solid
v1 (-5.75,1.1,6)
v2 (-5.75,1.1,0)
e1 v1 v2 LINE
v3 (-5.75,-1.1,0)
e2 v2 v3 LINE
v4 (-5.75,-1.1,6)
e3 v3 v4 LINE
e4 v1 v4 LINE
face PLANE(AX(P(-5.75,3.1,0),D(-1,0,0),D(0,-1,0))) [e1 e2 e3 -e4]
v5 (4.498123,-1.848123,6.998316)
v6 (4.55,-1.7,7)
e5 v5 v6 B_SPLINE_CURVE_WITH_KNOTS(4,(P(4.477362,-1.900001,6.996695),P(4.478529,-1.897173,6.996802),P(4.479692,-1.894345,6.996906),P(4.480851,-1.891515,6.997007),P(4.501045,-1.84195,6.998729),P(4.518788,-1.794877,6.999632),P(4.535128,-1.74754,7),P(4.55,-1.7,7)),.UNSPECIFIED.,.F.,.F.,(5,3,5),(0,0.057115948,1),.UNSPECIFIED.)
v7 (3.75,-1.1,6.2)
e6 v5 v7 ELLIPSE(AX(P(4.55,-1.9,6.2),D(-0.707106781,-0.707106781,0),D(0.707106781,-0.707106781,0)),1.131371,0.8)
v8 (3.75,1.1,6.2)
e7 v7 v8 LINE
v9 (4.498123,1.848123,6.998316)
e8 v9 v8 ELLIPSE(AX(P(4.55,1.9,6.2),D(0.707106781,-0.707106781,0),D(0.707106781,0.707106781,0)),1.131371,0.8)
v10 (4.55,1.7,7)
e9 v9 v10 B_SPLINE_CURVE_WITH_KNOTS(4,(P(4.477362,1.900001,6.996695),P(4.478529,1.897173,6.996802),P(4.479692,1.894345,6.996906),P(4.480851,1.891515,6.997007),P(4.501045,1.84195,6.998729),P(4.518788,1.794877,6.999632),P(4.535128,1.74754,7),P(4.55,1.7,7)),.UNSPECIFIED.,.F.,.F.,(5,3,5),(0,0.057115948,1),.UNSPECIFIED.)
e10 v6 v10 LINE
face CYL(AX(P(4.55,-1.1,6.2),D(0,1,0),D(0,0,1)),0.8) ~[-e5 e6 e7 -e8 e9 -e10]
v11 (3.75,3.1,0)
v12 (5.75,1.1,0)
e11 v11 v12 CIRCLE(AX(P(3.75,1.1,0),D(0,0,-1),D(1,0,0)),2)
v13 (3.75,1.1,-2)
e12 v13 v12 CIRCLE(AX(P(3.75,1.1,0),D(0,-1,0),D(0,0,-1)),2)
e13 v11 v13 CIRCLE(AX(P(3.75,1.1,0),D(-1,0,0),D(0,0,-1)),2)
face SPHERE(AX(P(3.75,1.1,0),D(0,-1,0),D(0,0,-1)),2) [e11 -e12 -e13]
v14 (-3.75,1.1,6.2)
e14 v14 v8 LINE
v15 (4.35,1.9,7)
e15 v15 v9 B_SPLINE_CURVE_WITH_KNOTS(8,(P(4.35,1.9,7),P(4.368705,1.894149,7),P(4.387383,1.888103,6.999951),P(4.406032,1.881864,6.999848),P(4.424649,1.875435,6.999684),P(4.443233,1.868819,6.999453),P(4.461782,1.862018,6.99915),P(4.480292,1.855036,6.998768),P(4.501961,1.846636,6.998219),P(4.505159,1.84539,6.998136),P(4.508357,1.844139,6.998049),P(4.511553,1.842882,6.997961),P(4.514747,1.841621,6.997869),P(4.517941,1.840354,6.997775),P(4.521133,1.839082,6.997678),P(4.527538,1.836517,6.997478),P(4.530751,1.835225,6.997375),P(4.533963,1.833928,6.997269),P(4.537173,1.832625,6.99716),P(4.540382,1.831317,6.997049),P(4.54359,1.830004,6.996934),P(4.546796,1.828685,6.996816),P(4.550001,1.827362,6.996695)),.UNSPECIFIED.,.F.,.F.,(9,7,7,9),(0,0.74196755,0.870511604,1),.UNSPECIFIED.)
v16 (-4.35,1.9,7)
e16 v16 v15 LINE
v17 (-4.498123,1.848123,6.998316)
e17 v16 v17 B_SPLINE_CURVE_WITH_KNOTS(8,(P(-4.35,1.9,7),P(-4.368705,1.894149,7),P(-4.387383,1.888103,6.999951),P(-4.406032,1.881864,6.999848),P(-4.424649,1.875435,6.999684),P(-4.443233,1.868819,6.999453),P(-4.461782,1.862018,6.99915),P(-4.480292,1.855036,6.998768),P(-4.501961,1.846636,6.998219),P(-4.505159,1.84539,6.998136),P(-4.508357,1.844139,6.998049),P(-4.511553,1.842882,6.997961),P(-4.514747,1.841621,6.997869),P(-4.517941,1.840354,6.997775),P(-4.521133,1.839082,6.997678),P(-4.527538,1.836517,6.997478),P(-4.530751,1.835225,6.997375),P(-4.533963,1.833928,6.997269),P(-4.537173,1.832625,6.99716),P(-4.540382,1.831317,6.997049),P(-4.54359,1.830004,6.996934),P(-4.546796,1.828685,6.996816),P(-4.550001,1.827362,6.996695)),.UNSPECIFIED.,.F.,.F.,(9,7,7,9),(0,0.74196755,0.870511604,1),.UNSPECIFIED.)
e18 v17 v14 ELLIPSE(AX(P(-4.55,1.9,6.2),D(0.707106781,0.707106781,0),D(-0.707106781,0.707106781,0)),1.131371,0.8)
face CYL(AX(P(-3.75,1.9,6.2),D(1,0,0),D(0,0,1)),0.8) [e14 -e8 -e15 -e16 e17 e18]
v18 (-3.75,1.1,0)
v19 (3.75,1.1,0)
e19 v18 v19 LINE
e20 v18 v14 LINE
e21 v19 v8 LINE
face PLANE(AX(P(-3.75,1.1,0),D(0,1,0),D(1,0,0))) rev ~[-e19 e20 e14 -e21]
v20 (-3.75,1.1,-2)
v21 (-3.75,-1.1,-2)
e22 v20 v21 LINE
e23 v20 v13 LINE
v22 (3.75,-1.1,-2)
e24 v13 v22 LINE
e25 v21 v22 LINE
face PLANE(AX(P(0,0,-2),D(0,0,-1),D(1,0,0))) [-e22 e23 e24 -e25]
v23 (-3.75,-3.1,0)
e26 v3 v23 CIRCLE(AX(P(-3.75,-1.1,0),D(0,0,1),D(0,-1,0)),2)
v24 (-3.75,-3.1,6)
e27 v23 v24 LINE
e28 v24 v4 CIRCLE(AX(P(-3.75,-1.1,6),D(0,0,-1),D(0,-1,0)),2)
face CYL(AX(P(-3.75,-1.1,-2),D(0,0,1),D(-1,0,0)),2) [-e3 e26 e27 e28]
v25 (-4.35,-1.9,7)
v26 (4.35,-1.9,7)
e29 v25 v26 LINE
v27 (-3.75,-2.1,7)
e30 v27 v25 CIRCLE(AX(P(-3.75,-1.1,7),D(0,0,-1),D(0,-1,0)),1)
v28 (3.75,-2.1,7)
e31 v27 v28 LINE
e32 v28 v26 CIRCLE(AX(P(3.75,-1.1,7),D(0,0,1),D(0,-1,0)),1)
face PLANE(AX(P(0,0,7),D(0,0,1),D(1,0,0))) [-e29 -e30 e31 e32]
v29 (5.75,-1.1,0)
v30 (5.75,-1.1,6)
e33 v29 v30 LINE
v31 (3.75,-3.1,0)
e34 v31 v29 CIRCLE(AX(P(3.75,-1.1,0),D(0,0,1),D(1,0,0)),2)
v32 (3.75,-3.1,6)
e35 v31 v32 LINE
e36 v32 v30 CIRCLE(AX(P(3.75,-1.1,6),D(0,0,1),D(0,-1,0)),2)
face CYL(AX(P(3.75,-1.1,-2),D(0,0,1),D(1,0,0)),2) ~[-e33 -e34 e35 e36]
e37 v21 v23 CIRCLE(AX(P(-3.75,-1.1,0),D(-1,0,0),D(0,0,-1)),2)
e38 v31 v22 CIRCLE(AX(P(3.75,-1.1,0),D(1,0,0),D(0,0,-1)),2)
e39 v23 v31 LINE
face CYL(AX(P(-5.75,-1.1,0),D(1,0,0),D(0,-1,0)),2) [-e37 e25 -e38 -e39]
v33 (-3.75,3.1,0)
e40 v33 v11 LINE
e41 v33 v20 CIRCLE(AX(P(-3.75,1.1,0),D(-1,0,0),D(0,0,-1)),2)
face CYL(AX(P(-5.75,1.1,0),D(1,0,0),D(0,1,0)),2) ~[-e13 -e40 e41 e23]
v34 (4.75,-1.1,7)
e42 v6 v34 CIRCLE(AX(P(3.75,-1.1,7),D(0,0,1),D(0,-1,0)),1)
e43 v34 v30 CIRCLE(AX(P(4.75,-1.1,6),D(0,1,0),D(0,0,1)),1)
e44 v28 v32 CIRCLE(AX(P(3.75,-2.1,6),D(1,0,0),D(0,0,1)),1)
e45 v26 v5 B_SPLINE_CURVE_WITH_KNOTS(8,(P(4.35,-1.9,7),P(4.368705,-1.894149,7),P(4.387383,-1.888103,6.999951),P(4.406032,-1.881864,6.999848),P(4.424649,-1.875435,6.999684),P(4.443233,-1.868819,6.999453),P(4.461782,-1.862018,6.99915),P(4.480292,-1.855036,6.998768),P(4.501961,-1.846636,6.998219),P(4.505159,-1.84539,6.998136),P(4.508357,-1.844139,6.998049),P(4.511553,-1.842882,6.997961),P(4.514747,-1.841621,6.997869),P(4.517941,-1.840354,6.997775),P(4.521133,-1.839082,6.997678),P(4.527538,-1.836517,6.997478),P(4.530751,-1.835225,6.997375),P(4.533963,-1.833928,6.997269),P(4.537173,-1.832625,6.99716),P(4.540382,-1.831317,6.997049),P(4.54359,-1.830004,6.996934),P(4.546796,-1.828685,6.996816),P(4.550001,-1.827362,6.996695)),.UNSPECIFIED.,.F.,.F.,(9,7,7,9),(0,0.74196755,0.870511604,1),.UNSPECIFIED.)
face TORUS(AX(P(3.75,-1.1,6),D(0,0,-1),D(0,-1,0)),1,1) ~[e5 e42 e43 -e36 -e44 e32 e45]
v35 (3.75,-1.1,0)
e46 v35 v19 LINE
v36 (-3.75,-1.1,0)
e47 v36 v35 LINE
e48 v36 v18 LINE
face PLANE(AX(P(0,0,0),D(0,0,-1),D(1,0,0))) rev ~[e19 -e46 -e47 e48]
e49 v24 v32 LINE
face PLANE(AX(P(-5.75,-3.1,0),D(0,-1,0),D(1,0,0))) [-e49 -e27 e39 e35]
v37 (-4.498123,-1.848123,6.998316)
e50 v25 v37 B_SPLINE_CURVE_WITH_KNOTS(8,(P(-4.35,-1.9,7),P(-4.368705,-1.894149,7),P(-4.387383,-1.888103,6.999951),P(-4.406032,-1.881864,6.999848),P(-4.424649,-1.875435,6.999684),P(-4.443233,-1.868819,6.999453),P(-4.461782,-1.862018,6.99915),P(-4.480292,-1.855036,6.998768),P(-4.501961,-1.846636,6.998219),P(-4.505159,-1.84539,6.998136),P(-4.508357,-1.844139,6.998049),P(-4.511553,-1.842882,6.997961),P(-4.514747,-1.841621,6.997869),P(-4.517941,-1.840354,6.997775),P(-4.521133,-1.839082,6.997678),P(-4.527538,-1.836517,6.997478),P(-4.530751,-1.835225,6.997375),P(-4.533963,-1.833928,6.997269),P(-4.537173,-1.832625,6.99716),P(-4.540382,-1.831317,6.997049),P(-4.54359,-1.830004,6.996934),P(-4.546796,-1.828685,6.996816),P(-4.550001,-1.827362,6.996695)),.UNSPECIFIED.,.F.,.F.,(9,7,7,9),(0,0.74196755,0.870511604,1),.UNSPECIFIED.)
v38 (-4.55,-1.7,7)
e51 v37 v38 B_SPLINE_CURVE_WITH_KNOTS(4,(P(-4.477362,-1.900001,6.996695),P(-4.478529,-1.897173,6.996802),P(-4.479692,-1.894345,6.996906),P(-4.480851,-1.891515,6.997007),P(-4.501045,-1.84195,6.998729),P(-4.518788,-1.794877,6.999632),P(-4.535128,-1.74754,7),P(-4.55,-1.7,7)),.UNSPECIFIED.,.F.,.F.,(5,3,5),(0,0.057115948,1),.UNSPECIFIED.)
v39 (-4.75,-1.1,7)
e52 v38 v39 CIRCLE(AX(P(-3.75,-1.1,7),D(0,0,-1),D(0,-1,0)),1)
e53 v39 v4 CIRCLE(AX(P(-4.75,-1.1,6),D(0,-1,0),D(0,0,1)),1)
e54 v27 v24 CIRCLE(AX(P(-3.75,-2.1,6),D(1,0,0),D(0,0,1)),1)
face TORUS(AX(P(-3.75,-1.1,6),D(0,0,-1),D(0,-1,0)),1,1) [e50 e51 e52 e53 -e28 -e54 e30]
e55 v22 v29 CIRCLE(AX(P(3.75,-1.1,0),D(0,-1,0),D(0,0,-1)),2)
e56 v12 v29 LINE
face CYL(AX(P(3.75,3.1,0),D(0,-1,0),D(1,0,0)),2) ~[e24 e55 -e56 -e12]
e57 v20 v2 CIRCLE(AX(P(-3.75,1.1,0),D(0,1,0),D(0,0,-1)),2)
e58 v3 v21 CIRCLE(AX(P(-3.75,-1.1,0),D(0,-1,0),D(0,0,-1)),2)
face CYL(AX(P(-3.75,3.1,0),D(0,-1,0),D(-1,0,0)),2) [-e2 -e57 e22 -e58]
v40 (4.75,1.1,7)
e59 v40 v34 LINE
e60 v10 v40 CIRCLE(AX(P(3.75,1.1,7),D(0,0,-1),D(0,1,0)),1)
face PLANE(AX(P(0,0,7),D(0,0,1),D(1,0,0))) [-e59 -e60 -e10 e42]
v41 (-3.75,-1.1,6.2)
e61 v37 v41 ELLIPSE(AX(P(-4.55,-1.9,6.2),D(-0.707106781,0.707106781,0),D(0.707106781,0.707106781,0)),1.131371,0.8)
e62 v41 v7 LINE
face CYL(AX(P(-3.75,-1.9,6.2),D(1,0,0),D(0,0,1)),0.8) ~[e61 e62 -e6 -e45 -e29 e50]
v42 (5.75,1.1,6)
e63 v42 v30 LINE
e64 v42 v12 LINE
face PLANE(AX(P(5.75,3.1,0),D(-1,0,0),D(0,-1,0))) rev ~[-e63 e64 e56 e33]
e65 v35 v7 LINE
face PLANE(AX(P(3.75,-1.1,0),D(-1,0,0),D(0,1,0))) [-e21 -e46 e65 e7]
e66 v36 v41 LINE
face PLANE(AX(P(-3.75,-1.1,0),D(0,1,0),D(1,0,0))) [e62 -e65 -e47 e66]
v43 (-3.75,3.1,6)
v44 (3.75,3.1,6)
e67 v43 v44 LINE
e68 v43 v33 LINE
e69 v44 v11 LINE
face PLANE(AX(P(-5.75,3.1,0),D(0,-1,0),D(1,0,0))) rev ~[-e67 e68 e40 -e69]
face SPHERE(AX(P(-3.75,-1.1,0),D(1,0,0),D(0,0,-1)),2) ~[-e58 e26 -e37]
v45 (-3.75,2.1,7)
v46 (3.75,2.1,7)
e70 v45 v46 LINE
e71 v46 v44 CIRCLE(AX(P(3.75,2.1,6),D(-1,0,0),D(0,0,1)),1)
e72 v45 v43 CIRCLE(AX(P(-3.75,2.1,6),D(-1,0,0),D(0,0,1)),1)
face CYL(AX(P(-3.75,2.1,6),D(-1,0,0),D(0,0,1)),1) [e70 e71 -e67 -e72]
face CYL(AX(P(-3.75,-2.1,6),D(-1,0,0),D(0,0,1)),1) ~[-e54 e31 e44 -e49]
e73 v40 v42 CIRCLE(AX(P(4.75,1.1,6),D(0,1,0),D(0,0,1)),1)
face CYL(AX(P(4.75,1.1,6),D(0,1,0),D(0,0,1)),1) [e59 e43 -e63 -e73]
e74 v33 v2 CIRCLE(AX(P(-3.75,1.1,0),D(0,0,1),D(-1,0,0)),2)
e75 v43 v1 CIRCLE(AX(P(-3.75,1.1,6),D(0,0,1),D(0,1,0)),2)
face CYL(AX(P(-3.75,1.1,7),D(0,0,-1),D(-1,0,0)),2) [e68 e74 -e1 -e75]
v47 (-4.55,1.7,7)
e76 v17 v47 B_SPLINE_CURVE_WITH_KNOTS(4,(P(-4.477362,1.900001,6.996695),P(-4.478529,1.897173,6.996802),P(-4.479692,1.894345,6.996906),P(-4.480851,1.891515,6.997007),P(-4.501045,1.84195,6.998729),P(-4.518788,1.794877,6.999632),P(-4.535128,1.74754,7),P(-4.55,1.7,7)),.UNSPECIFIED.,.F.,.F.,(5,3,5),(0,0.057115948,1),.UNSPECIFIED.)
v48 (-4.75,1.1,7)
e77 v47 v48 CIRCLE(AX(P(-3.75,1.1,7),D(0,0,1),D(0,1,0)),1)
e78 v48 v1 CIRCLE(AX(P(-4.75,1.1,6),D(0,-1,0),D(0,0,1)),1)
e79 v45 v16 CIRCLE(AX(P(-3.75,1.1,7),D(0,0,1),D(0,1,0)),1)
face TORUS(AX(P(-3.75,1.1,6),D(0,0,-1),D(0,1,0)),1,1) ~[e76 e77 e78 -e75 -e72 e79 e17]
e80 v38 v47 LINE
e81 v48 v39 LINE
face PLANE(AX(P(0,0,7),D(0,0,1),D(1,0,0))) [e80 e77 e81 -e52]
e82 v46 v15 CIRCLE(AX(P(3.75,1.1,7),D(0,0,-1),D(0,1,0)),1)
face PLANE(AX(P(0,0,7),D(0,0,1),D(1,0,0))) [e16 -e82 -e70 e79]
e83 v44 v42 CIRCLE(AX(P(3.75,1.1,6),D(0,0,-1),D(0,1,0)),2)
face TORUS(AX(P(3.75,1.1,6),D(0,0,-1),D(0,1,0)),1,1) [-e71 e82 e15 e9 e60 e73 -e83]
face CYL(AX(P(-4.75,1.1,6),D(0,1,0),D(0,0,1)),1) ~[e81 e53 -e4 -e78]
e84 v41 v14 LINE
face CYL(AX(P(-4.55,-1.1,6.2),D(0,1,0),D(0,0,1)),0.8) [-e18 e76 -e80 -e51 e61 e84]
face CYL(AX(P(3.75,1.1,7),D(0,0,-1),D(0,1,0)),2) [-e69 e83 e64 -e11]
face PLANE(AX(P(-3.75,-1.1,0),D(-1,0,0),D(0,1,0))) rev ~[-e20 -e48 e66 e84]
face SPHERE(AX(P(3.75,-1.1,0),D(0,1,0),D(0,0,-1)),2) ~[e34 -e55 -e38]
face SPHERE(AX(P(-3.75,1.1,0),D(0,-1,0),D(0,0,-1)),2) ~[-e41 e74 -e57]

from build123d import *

# Parameters (mm, degrees)
F0_W         = 11.5
F0_H         = 6.2
F0_W_2       = 7.5
F0_H_2       = 2.2
F1_DEPTH     = 7
F2_W         = 11.5
F2_H         = 6.2
F3_DEPTH     = 2
F4_R         = 2
F5_R         = 0.8
F6_T1_DEPTH  = 2.2
F6_T3_DEPTH  = 7.5
F6_T6_ANGLE  = 90
F6_T8_ANGLE  = 90
F6_T10_ANGLE = 90
F6_T12_ANGLE = 90


# Not quite as in the source:
# - a fillet or chamfer that OpenCascade refuses, or shapes differently, is made with other operations: its cross-section is extruded or revolved along the edge and cut away or added


with BuildPart() as f1:
    # F0 (on Top) → F1 (new body)
    with BuildSketch(Plane.XY):
        Rectangle(F0_W, F0_H)
        Rectangle(F0_W_2, F0_H_2, mode=Mode.SUBTRACT)
    extrude(amount=F1_DEPTH)

    # F2 (on face) → F3 (join)
    with BuildSketch(Plane(origin=(0, 0, 0), x_dir=(1, 0, 0), z_dir=(0, 0, -1))):
        Rectangle(F2_W, F2_H)
    extrude(amount=F3_DEPTH)

    # F4
    f4_edges = [f1.edges().sort_by_distance(p)[0] for p in [
        (5.75, 0, -2),
        (0, -3.1, -2),
        (-5.75, 0, -2),
        (0, 3.1, -2),
        (5.75, -3.1, 2.5),
        (5.75, 3.1, 2.5),
        (-5.75, -3.1, 2.5),
        (-5.75, 3.1, 2.5),
    ]]
    fillet(f4_edges, radius=F4_R)

    # F5
    f5_edges = [f1.edges().sort_by_distance(p)[0] for p in [
        (0, -1.1, 7),
        (3.75, 0, 7),
        (-3.75, 0, 7),
        (0, 1.1, 7),
    ]]
    fillet(f5_edges, radius=F5_R)

    # F6: fillet of radius 1 on 8 edges, made by hand

    # F6_s2 → F6_t1 (cut)
    with BuildSketch(Plane.XZ.offset(-1.1)):
        with BuildLine():
            ThreePointArc((4.75, 7), (5.4571067812, 6.7071067812), (5.75, 6))
            Line((5.75, 6), (5.75, 7))
            Line((5.75, 7), (4.75, 7))
        make_face()
        with BuildLine():
            ThreePointArc((-4.75, 7), (-5.4571067812, 6.7071067812), (-5.75, 6))
            Line((-5.75, 6), (-5.75, 7))
            Line((-5.75, 7), (-4.75, 7))
        make_face()
    extrude(amount=F6_T1_DEPTH, mode=Mode.SUBTRACT)

    # F6_s4 → F6_t3 (cut)
    with BuildSketch(Plane.YZ.offset(-3.75)):
        with BuildLine():
            ThreePointArc((2.1, 7), (2.8071067812, 6.7071067812), (3.1, 6))
            Line((3.1, 6), (3.1, 7))
            Line((3.1, 7), (2.1, 7))
        make_face()
        with BuildLine():
            ThreePointArc((-2.1, 7), (-2.8071067812, 6.7071067812), (-3.1, 6))
            Line((-3.1, 6), (-3.1, 7))
            Line((-3.1, 7), (-2.1, 7))
        make_face()
    extrude(amount=F6_T3_DEPTH, mode=Mode.SUBTRACT)

    # F6_s5 → F6_t6 (revolve, cut)
    with BuildSketch(Plane.YZ.offset(3.75)):
        with BuildLine():
            ThreePointArc((2.1, 7), (2.8071067812, 6.7071067812), (3.1, 6))
            Line((3.1, 6), (3.1, 7))
            Line((3.1, 7), (2.1, 7))
        make_face()
    revolve(axis=Axis((3.75, 1.1, 7), (0, 0, -1)), revolution_arc=F6_T6_ANGLE, mode=Mode.SUBTRACT)

    # F6_s7 → F6_t8 (revolve, cut)
    with BuildSketch(Plane.YZ.offset(-3.75)):
        with BuildLine():
            ThreePointArc((2.1, 7), (2.8071067812, 6.7071067812), (3.1, 6))
            Line((3.1, 6), (3.1, 7))
            Line((3.1, 7), (2.1, 7))
        make_face()
    revolve(axis=Axis((-3.75, 1.1, 7), (0, 0, 1)), revolution_arc=F6_T8_ANGLE, mode=Mode.SUBTRACT)

    # F6_s9 → F6_t10 (revolve, cut)
    with BuildSketch(Plane.YZ.offset(3.75)):
        with BuildLine():
            ThreePointArc((-2.1, 7), (-2.8071067812, 6.7071067812), (-3.1, 6))
            Line((-3.1, 6), (-3.1, 7))
            Line((-3.1, 7), (-2.1, 7))
        make_face()
    revolve(axis=Axis((3.75, -1.1, 7), (0, 0, 1)), revolution_arc=F6_T10_ANGLE, mode=Mode.SUBTRACT)

    # F6_s11 → F6_t12 (revolve, cut)
    with BuildSketch(Plane.YZ.offset(-3.75)):
        with BuildLine():
            ThreePointArc((-2.1, 7), (-2.8071067812, 6.7071067812), (-3.1, 6))
            Line((-3.1, 6), (-3.1, 7))
            Line((-3.1, 7), (-2.1, 7))
        make_face()
    revolve(axis=Axis((-3.75, -1.1, 7), (0, 0, -1)), revolution_arc=F6_T12_ANGLE, mode=Mode.SUBTRACT)


solid = f1.part
